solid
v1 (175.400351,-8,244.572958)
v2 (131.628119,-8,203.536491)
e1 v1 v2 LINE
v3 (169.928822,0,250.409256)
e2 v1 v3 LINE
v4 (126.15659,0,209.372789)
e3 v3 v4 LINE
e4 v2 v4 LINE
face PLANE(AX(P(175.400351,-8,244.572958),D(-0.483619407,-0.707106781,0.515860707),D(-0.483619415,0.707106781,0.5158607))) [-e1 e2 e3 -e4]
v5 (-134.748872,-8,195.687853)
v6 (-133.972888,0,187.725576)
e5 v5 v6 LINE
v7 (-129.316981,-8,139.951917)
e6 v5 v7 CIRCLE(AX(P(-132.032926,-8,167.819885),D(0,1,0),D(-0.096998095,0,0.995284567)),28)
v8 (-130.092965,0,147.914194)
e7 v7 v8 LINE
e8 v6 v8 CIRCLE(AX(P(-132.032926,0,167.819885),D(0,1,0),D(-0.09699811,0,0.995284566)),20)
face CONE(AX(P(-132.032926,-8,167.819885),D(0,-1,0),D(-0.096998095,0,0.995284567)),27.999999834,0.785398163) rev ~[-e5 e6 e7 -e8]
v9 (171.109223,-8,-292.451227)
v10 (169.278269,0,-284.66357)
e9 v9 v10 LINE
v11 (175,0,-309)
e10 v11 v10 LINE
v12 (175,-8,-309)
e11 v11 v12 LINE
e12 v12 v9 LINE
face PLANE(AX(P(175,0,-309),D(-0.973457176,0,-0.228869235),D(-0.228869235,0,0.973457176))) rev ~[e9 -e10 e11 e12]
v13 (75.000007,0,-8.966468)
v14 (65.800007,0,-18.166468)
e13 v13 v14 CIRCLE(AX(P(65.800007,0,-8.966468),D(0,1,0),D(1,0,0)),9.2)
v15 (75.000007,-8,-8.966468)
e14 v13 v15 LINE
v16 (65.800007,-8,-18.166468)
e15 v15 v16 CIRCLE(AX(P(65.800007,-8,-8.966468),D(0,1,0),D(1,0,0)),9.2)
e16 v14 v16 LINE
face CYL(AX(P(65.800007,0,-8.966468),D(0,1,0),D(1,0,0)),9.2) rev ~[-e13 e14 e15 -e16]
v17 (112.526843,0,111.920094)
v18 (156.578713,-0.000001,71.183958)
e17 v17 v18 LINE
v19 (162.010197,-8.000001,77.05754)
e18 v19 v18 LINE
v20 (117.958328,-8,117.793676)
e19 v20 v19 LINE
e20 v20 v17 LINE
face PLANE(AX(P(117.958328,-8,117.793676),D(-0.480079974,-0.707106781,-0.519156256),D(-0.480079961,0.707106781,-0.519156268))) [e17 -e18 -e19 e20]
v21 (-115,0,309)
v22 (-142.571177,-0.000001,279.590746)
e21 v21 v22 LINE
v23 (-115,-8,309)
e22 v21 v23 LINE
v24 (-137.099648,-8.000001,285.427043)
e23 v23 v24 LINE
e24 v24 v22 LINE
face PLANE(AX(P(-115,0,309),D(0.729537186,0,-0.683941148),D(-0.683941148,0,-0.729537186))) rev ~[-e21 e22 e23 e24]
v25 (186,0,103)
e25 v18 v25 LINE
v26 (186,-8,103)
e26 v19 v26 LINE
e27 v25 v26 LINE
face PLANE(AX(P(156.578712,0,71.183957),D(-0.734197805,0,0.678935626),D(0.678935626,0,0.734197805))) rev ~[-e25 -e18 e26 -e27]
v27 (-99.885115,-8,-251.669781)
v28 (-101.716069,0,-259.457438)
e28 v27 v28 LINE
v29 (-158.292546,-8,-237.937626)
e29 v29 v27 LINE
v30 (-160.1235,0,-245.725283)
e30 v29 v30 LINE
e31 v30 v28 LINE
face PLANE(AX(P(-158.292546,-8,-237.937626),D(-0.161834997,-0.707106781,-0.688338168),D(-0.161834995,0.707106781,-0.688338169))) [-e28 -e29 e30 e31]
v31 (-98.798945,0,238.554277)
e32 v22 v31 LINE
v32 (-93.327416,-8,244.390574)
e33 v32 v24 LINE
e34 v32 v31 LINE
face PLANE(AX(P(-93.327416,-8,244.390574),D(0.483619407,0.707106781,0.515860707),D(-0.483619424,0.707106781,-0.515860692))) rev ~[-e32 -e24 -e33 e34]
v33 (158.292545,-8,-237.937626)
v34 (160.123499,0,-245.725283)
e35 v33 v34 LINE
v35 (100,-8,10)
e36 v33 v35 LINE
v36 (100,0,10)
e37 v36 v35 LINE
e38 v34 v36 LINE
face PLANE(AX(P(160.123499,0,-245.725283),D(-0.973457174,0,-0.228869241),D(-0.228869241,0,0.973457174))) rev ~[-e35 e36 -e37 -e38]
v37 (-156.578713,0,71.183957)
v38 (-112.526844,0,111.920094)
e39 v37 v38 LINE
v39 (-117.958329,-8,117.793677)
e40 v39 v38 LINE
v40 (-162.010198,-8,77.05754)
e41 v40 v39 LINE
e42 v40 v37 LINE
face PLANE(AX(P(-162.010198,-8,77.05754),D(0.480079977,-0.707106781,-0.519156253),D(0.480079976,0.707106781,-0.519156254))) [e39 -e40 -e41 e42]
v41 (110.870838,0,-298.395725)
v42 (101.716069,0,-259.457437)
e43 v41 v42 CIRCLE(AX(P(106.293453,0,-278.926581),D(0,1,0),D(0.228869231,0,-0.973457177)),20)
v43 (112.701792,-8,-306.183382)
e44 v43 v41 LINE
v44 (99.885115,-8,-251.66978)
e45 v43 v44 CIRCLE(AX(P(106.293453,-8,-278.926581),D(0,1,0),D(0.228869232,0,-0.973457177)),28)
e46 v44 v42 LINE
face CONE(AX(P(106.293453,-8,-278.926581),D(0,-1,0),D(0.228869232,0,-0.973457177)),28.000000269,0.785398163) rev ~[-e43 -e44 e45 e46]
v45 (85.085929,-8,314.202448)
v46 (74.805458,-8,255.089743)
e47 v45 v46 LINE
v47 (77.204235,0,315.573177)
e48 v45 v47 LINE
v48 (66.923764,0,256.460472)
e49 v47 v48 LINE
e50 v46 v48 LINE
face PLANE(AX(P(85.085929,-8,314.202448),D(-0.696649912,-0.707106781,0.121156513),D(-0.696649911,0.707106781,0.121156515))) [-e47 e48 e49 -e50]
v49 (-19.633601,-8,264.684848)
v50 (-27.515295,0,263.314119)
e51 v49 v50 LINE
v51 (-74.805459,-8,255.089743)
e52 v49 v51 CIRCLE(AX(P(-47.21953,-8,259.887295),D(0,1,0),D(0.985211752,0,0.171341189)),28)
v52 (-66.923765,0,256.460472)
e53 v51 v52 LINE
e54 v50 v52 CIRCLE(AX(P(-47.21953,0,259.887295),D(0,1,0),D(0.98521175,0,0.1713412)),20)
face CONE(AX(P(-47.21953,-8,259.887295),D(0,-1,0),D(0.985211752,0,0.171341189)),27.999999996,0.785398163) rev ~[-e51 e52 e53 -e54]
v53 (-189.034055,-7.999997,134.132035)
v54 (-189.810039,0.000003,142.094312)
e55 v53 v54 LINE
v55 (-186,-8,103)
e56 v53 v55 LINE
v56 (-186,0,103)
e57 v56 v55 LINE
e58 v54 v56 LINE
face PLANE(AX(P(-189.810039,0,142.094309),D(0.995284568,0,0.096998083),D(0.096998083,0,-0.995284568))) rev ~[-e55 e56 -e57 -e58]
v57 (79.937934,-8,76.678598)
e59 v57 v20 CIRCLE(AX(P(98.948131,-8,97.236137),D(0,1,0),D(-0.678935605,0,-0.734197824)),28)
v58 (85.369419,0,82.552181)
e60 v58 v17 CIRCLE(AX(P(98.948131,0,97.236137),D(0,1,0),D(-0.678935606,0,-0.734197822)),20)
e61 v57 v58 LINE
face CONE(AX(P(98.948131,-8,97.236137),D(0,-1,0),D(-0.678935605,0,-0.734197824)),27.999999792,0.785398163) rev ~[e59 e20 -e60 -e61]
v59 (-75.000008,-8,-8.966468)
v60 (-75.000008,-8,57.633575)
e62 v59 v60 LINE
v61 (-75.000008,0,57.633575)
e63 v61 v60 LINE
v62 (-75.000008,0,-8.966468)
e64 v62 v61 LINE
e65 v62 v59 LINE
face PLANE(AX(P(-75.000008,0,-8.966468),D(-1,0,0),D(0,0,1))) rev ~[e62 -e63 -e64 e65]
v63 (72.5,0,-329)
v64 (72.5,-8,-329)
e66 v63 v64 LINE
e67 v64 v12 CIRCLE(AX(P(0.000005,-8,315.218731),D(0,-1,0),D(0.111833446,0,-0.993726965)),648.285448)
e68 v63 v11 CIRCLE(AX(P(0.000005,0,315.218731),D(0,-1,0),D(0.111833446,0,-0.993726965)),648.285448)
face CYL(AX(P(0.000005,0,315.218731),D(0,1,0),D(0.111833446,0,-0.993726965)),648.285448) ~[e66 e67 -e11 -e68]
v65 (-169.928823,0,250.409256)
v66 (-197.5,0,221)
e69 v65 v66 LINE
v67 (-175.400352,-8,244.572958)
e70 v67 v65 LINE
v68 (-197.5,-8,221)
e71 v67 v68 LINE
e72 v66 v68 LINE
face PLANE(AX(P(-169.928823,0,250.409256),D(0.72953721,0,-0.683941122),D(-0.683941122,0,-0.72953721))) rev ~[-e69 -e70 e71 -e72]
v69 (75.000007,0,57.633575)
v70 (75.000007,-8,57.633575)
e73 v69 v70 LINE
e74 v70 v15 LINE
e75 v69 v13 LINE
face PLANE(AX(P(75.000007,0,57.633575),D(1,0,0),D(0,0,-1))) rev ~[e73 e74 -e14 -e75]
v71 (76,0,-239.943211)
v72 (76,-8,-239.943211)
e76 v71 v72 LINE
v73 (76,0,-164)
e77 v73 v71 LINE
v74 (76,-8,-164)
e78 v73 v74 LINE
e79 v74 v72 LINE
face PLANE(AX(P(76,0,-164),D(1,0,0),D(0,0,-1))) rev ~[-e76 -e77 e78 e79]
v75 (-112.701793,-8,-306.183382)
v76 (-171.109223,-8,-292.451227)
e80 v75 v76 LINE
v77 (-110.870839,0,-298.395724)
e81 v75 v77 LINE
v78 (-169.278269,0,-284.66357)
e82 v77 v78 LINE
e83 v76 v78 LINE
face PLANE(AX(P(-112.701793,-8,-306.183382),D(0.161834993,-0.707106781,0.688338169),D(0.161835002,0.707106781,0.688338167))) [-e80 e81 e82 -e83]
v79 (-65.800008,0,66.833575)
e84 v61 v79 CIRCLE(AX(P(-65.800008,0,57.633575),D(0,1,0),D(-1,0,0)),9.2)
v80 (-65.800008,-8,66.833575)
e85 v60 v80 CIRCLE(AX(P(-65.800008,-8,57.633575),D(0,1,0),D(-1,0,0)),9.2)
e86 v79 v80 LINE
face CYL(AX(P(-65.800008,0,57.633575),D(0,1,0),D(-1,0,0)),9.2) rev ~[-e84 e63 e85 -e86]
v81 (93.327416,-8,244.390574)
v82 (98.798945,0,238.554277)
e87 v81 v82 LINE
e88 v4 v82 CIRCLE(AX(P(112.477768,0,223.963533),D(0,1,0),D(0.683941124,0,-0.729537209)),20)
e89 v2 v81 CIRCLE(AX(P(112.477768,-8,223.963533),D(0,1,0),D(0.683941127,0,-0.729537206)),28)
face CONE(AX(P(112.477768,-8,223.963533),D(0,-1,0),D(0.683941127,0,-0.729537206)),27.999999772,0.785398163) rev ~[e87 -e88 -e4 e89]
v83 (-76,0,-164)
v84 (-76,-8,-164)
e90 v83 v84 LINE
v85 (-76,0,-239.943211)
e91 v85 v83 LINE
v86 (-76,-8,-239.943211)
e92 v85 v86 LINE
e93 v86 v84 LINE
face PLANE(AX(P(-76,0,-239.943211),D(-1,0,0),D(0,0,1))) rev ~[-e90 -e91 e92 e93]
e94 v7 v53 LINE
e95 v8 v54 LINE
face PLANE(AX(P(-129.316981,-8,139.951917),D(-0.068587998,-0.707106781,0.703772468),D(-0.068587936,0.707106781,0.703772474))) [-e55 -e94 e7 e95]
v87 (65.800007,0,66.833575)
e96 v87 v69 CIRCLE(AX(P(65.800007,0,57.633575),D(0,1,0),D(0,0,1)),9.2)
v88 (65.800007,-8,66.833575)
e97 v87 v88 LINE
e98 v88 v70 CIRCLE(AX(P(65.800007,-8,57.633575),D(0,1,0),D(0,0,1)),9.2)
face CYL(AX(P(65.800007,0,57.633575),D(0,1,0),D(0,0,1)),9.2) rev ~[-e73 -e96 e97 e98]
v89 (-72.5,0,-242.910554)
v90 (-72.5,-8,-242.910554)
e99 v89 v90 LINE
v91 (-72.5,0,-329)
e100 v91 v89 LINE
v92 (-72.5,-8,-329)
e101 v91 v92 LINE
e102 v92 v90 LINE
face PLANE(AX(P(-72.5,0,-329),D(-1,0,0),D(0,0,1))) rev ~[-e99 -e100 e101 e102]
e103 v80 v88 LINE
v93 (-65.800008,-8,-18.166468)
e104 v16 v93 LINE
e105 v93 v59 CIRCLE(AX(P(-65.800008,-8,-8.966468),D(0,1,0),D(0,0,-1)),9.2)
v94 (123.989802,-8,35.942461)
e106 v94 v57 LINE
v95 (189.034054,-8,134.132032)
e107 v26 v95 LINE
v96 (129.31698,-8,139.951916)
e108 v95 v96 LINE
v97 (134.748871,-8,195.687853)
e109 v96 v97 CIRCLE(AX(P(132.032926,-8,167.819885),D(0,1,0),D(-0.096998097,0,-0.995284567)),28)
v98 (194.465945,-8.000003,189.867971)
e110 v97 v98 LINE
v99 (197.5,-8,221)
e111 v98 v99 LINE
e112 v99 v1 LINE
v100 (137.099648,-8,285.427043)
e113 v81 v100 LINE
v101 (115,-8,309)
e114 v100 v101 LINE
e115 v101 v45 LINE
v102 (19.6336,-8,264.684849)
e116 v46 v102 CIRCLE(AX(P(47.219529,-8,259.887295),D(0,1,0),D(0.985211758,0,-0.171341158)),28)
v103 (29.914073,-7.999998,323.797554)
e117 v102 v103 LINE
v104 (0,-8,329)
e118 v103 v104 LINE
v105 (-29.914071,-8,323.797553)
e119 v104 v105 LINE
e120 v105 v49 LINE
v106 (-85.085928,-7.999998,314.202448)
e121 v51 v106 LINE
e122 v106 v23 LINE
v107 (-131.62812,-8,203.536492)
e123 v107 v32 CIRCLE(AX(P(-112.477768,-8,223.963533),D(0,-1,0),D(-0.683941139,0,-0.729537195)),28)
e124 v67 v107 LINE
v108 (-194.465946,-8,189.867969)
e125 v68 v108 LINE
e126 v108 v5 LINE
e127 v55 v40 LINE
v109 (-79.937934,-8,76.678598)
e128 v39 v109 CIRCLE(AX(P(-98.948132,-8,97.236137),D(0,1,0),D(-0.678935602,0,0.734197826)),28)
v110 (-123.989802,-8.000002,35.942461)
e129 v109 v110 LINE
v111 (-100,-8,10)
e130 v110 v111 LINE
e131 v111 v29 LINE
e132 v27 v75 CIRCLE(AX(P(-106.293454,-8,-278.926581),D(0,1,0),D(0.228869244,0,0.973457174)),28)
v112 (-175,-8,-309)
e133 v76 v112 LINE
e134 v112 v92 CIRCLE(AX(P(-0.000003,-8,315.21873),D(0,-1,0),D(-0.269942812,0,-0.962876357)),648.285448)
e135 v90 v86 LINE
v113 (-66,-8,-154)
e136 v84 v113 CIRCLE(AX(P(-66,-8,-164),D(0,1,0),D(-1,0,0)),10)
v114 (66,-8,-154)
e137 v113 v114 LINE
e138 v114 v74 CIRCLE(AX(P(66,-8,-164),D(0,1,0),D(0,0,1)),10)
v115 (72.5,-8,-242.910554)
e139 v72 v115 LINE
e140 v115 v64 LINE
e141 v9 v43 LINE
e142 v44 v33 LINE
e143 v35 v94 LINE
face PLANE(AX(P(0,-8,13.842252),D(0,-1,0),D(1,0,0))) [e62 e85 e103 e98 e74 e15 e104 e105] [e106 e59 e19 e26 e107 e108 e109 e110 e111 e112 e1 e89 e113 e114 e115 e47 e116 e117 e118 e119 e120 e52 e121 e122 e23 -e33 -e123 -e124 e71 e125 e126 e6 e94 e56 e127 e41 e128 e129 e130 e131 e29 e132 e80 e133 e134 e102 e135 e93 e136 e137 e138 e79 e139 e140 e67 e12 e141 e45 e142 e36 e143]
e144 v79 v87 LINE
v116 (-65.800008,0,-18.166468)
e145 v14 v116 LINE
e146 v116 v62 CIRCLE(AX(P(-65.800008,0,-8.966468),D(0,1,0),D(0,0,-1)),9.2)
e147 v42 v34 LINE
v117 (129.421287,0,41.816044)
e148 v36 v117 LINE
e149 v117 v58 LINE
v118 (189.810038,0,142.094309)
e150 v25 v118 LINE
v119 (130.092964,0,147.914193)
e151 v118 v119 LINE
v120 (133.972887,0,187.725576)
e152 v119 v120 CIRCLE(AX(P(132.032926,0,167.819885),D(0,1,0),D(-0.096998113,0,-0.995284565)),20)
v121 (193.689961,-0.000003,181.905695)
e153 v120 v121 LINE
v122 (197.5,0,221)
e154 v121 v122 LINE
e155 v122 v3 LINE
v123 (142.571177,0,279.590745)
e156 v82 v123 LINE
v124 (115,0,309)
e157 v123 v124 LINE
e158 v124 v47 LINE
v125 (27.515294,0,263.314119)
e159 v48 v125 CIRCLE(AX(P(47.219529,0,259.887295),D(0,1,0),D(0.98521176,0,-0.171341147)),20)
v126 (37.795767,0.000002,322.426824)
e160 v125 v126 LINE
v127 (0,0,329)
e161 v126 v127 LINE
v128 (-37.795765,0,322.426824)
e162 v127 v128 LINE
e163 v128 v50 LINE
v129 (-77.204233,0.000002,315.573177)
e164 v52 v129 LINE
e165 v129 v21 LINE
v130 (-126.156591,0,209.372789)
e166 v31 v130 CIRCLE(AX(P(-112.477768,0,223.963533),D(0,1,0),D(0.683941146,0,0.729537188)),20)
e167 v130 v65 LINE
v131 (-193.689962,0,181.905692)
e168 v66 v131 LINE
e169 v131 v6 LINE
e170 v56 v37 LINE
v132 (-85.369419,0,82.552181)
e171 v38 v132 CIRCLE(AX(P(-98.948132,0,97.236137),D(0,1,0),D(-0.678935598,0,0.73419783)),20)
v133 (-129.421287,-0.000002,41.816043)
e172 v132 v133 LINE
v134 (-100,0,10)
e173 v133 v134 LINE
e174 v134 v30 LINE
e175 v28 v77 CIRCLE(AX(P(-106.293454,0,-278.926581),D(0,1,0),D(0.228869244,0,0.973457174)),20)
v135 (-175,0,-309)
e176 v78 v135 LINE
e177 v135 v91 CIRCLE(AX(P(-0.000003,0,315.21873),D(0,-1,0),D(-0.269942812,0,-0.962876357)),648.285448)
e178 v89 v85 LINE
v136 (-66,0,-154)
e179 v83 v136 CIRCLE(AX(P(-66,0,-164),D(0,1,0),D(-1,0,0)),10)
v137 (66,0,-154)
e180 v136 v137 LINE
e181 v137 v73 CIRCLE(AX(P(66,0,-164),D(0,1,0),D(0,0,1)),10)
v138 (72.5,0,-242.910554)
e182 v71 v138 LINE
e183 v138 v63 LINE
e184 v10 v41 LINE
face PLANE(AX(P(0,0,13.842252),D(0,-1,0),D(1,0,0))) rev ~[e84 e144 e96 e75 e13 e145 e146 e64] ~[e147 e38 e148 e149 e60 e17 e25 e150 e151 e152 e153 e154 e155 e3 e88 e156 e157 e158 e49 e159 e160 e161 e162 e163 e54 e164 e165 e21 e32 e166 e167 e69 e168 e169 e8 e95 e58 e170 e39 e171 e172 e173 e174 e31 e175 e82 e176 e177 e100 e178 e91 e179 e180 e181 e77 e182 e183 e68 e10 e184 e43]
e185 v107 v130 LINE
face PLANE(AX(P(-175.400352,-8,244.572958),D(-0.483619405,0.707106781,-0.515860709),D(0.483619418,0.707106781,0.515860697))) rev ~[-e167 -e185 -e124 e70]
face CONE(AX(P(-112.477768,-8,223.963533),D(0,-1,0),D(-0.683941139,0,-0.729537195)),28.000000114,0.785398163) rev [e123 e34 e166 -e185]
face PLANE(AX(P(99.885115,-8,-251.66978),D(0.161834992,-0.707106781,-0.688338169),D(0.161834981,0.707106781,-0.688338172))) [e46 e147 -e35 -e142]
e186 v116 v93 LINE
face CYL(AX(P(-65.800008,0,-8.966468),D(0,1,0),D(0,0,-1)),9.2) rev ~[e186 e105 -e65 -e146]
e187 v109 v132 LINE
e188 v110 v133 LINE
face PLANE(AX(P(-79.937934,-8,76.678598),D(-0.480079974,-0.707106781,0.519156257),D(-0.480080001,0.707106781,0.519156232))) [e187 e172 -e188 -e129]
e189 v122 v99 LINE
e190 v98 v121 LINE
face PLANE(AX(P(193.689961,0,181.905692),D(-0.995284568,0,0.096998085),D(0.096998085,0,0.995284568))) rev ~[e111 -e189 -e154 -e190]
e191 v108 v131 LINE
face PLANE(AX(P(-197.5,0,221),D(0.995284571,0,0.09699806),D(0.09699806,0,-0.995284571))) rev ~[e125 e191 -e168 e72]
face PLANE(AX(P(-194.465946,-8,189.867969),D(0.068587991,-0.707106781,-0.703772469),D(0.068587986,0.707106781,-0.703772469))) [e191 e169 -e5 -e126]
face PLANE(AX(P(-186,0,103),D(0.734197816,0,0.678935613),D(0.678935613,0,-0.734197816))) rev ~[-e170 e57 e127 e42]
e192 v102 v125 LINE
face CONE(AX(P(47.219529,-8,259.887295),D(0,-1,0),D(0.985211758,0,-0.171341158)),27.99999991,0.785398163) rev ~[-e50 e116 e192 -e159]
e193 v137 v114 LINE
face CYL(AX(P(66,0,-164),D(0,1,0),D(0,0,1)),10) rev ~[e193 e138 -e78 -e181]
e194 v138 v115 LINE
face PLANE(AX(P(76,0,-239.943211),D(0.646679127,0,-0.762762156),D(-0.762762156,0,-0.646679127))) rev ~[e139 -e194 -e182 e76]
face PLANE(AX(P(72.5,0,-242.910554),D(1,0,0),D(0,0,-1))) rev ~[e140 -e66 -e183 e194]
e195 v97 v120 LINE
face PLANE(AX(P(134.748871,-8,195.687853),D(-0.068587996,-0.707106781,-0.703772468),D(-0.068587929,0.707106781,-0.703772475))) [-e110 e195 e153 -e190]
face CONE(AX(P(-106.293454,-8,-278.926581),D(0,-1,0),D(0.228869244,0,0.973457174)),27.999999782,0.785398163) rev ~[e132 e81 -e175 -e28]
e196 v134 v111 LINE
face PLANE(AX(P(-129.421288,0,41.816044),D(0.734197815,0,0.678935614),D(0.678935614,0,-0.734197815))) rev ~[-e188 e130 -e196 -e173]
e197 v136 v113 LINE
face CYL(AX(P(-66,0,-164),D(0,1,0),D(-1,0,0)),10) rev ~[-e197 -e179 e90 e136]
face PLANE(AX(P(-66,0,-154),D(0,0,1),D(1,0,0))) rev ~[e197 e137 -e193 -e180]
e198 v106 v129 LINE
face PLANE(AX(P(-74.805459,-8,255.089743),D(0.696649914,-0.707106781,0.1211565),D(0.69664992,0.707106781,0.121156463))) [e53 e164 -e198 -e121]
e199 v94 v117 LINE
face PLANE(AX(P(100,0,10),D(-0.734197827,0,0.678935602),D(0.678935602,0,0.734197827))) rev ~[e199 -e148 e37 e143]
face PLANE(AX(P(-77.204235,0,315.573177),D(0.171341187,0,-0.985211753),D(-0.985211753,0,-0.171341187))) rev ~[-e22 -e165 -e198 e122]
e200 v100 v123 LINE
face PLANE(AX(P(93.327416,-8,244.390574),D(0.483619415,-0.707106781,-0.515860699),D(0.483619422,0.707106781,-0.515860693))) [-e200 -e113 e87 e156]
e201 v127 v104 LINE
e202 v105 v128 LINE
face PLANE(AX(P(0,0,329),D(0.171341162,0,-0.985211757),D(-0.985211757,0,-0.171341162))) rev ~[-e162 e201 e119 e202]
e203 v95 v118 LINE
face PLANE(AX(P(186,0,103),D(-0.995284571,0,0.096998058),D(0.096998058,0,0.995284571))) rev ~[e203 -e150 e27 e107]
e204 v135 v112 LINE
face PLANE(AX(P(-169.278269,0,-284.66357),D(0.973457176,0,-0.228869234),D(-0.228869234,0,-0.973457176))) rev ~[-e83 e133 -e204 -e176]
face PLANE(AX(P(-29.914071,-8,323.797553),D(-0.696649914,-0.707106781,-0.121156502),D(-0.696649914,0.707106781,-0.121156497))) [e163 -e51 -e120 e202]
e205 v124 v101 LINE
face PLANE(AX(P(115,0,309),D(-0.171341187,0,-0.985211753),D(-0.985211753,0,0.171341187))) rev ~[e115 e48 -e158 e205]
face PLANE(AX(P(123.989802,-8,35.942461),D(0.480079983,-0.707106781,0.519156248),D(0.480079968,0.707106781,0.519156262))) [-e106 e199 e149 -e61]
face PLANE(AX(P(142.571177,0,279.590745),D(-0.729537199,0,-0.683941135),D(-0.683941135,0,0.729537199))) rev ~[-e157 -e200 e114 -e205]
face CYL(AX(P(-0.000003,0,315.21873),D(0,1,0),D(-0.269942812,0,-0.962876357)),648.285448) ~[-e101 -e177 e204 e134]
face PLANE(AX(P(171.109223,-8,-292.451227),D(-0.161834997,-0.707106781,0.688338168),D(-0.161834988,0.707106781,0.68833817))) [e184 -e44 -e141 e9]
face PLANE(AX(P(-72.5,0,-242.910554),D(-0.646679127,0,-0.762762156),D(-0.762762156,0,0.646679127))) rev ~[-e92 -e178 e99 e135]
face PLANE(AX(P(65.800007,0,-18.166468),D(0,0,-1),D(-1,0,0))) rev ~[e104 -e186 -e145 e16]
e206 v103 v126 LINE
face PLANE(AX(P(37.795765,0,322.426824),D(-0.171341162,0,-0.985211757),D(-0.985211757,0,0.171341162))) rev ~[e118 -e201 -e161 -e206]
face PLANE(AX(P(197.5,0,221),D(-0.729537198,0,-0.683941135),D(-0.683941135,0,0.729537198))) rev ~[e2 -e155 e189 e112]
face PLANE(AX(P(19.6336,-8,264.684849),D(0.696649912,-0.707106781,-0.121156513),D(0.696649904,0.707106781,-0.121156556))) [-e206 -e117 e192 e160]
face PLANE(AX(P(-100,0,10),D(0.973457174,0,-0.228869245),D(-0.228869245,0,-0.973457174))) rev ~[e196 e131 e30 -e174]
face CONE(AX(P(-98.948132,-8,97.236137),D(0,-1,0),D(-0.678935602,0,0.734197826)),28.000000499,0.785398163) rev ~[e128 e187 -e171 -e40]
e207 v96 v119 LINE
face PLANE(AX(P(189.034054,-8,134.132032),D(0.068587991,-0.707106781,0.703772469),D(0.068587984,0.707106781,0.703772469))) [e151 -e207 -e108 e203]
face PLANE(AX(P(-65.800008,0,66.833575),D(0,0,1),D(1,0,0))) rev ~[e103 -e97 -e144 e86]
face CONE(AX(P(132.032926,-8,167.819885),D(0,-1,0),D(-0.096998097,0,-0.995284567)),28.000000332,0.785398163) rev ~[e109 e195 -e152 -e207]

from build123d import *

# Parameters (mm, degrees)
F1_DEPTH = 8


# Not quite as in the source:
# - ends of sketch curves that miss each other by under 0.0002 mm in the source are joined


with BuildPart() as f1:
    # F0 (on Front) → F1 (new body)
    with BuildSketch(Plane.XZ):
        with BuildLine():
            Line((76, -164), (76, -239.943211))
            Line((76, -239.943211), (72.5, -242.910554))
            Line((72.5, -242.910554), (72.5, -329))
            ThreePointArc((72.5, -329), (124.1533829832, -321.067337789), (175.0000000351, -309.0000001251))
            Line((175.0000000351, -309.0000001251), (169.278269, -284.66357))
            Line((169.278269, -284.66357), (110.870838, -298.395725))
            ThreePointArc((110.870838, -298.395725), (86.8243094388, -283.5039655144), (101.716068848, -259.4574373536))
            Line((101.716068848, -259.4574373536), (160.123499, -245.725283))
            Line((160.123499, -245.725283), (100, 10))
            Line((100, 10), (129.421287, 41.816044))
            Line((129.421287, 41.816044), (85.369419, 82.552181))
            ThreePointArc((85.369419, 82.552181), (84.2641744646, 110.8148490327), (112.5268427835, 111.9200937658))
            Line((112.5268427835, 111.9200937658), (156.578712, 71.183957))
            Line((156.578712, 71.183957), (186, 103))
            Line((186, 103), (189.810038, 142.094309))
            Line((189.810038, 142.094309), (130.092964, 147.914193))
            ThreePointArc((130.092964, 147.914193), (112.1272346173, 169.7598464886), (133.9728870415, 187.7255764263))
            Line((133.9728870415, 187.7255764263), (193.689961, 181.905692))
            Line((193.689961, 181.905692), (197.5, 221))
            Line((197.5, 221), (169.928822, 250.409256))
            Line((169.928822, 250.409256), (126.15659, 209.372789))
            ThreePointArc((126.15659, 209.372789), (97.8870239172, 210.2847104224), (98.7989451563, 238.5542768333))
            Line((98.7989451563, 238.5542768333), (142.571177, 279.590745))
            Line((142.571177, 279.590745), (115, 309))
            Line((115, 309), (77.204235, 315.573177))
            Line((77.204235, 315.573177), (66.923764, 256.460472))
            ThreePointArc((66.923764, 256.460472), (43.7927054839, 240.1830599073), (27.5152939917, 263.3141190014))
            Line((27.5152939917, 263.3141190014), (37.795765, 322.426824))
            Line((37.795765, 322.426824), (0, 329))
            Line((0, 329), (-37.795765, 322.426824))
            Line((-37.795765, 322.426824), (-27.515295, 263.314119))
            ThreePointArc((-27.515295, 263.314119), (-43.7927064839, 240.1830599073), (-66.9237651771, 256.4604719692))
            Line((-66.9237651771, 256.4604719692), (-77.204235, 315.573177))
            Line((-77.204235, 315.573177), (-115, 309))
            Line((-115, 309), (-142.571178, 279.590745))
            Line((-142.571178, 279.590745), (-98.798945, 238.554277))
            ThreePointArc((-98.798945, 238.554277), (-97.8870241667, 210.2847101563), (-126.1565908437, 209.3727891667))
            Line((-126.1565908437, 209.3727891667), (-169.928823, 250.409256))
            Line((-169.928823, 250.409256), (-197.5, 221))
            Line((-197.5, 221), (-193.689962, 181.905692))
            Line((-193.689962, 181.905692), (-133.972888, 187.725576))
            ThreePointArc((-133.972888, 187.725576), (-112.1272346173, 169.7598464886), (-130.092965055, 147.9141935643))
            Line((-130.092965055, 147.9141935643), (-189.810039, 142.094309))
            Line((-189.810039, 142.094309), (-186, 103))
            Line((-186, 103), (-156.578713, 71.183957))
            Line((-156.578713, 71.183957), (-112.526844, 111.920094))
            ThreePointArc((-112.526844, 111.920094), (-84.2641747139, 110.8148493022), (-85.3694187181, 82.5521806951))
            Line((-85.3694187181, 82.5521806951), (-129.421288, 41.816044))
            Line((-129.421288, 41.816044), (-100, 10))
            Line((-100, 10), (-160.1235, -245.725283))
            Line((-160.1235, -245.725283), (-101.716069, -259.457438))
            ThreePointArc((-101.716069, -259.457438), (-86.8243105502, -283.5039659882), (-110.8708388768, -298.395724476))
            Line((-110.8708388768, -298.395724476), (-169.278269, -284.66357))
            Line((-169.278269, -284.66357), (-175, -309))
            ThreePointArc((-175, -309), (-124.1533829832, -321.067337789), (-72.5000000145, -329.0000001291))
            Line((-72.5000000145, -329.0000001291), (-72.5, -242.910554))
            Line((-72.5, -242.910554), (-76, -239.943211))
            Line((-76, -239.943211), (-76, -164))
            ThreePointArc((-76, -164), (-73.0710678119, -156.9289321881), (-66, -154))
            Line((-66, -154), (0, -154))
            Line((0, -154), (66, -154))
            ThreePointArc((66, -154), (73.0710678119, -156.9289321881), (76, -164))
        make_face()
        with BuildLine():
            Line((65.800007, -18.166468), (0, -18.166468))
            Line((0, -18.166468), (-65.800008, -18.166468))
            ThreePointArc((-65.800008, -18.166468), (-72.3053903869, -15.4718503869), (-75.000008, -8.966468))
            Line((-75.000008, -8.966468), (-75.000008, 57.633575))
            ThreePointArc((-75.000008, 57.633575), (-72.3053903869, 64.1389573869), (-65.800008, 66.833575))
            Line((-65.800008, 66.833575), (0, 66.833575))
            Line((0, 66.833575), (65.800007, 66.833575))
            ThreePointArc((65.800007, 66.833575), (72.3053893869, 64.1389573869), (75.000007, 57.633575))
            Line((75.000007, 57.633575), (75.000007, -8.966468))
            ThreePointArc((75.000007, -8.966468), (72.3053893869, -15.4718503869), (65.800007, -18.166468))
        make_face(mode=Mode.SUBTRACT)
    extrude(amount=F1_DEPTH)

    # F3: sweep along a path in F3_path
    with BuildLine(Plane(origin=(110.870838, -8, -298.395725), x_dir=(0, 0, 1), z_dir=(0, -1, 0))) as f3_path:
        Line((13.732155, -58.407431), (0, 0))
        ThreePointArc((0, 0), (14.8917592236, 24.0465284996), (38.9382876464, 9.154769152))
        Line((38.9382876464, 9.154769152), (52.670442, -49.252661))
    # F2 (on face) → F3 (sweep, cut)
    with BuildSketch(Plane(origin=(96.989833717, 0, 22.8032516792), x_dir=(0, 1, 0), z_dir=(0.973457176, 0, 0.2288692344))):
        Polygon((0, -315.8503827909), (-8, -315.8503827909), (-8, -323.8503827909), align=None)
    sweep(path=f3_path.line, mode=Mode.SUBTRACT)

    # F5: sweep along a path in F5_path
    with BuildLine(Plane(origin=(85.369419, -8, 82.552181), x_dir=(0, 0, 1), z_dir=(0, -1, 0))) as f5_path:
        Line((-40.736137, -44.051868), (0, 0))
        ThreePointArc((0, 0), (28.2626681852, 1.1052443944), (29.3679127658, -27.1574237835))
        Line((29.3679127658, -27.1574237835), (-11.368224, -71.209293))
    # F4 (on face) → F5 (sweep, cut)
    with BuildSketch(Plane(origin=(48.9199144477, 0, -45.2377688119), x_dir=(0, 1, 0), z_dir=(0.7341978267, 0, -0.6789356017))):
        Polygon((0, 118.5699679847), (-8, 118.5699679847), (-8, 110.5699679847), align=None)
    sweep(path=f5_path.line, mode=Mode.SUBTRACT)

    # F7: sweep along a path in F7_path
    with BuildLine(Plane(origin=(130.092964, -8, 147.914193), x_dir=(0, 0, 1), z_dir=(0, -1, 0))) as f7_path:
        Line((-5.819884, -59.717074), (0, 0))
        ThreePointArc((0, 0), (21.8456531581, 17.9657294149), (39.8113834263, -3.8799230415))
        Line((39.8113834263, -3.8799230415), (33.991499, -63.596997))
    # F6 (on face) → F7 (sweep, cut)
    with BuildSketch(Plane(origin=(174.3063070687, 0, -16.9874764527), x_dir=(0, 1, 0), z_dir=(0.9952845708, 0, -0.0969980576))):
        Polygon((0, 159.8354783382), (-8, 159.8354783382), (-8, 151.8354783382), align=None)
    sweep(path=f7_path.line, mode=Mode.SUBTRACT)

    # F9: sweep along a path in F9_path
    with BuildLine(Plane(origin=(126.15659, -8, 209.372789), x_dir=(0, 0, 1), z_dir=(0, -1, 0))) as f9_path:
        Line((41.036467, -43.772232), (0, 0))
        ThreePointArc((0, 0), (0.9119215885, 28.2695662386), (29.1814878333, 27.3576448437))
        Line((29.1814878333, 27.3576448437), (70.217956, -16.414587))
    # F8 (on face) → F9 (sweep, cut)
    with BuildSketch(Plane(origin=(215.3846137301, 0, 201.9230790338), x_dir=(0, 1, 0), z_dir=(0.729537198, 0, 0.6839411355))):
        Polygon((0, 66.4615554934), (-8, 66.4615554934), (-8, 58.4615554934), align=None)
    sweep(path=f9_path.line, mode=Mode.SUBTRACT)

    # F11: sweep along a path in F11_path
    with BuildLine(Plane(origin=(66.923764, -8, 256.460472), x_dir=(0, 0, 1), z_dir=(0, -1, 0))) as f11_path:
        Line((59.112705, -10.280471), (0, 0))
        ThreePointArc((0, 0), (-16.2774120773, 23.1310586047), (6.8536470014, 39.4084700083))
        Line((6.8536470014, 39.4084700083), (65.966352, 29.127999))
    # F10 (on face) → F11 (sweep, cut)
    with BuildSketch(Plane(origin=(55.5376187282, 0, 319.3412844519), x_dir=(0.9852117527, 0, -0.1713411869), z_dir=(0.1713411869, 0, 0.9852117527))):
        Polygon((21.9918369956, 0), (21.9918369956, -8), (29.9918369956, -8), align=None)
    sweep(path=f11_path.line, mode=Mode.SUBTRACT)

    # F13: sweep along a path in F13_path
    with BuildLine(Plane(origin=(-27.515295, -8, 263.314119), x_dir=(0, 0, 1), z_dir=(0, -1, 0))) as f13_path:
        Line((59.112705, 10.28047), (0, 0))
        ThreePointArc((0, 0), (-23.1310590934, 16.277411488), (-6.8536470308, 39.4084701771))
        Line((-6.8536470308, 39.4084701771), (52.259058, 49.68894))
    # F12 (on face) → F13 (sweep, cut)
    with BuildSketch(Plane(origin=(-55.5376105295, 0, 319.341285892), x_dir=(0.9852117571, 0, 0.1713411616), z_dir=(-0.1713411616, 0, 0.9852117571))):
        Polygon((18.008154492, 0), (18.008154492, -8), (26.008154492, -8), align=None)
    sweep(path=f13_path.line, mode=Mode.SUBTRACT)

    # F15: sweep along a path in F15_path
    with BuildLine(Plane(origin=(-126.1565908437, -8, 209.3727891667), x_dir=(0, 0, -1), z_dir=(0, 1, 0))) as f15_path:
        Line((-41.0364668333, 43.7722321563), (0, 0))
        ThreePointArc((0, 0), (-0.9119210729, -28.2695667552), (-29.1814878333, -27.3576458437))
        Line((-29.1814878333, -27.3576458437), (-70.2179558333, 16.4145871563))
    # F14 (on face) → F15 (sweep, cut)
    with BuildSketch(Plane(origin=(-215.3846129172, 0, 201.9230851377), x_dir=(0, -1, 0), z_dir=(-0.7295371863, 0, 0.6839411479))):
        Polygon((0, 106.461550303), (8, 106.461550303), (8, 114.461550303), align=None)
    sweep(path=f15_path.line, mode=Mode.SUBTRACT)

    # F17: sweep along a path in F17_path
    with BuildLine(Plane(origin=(-133.972888, -8, 187.725576), x_dir=(0, 0, 1), z_dir=(0, -1, 0))) as f17_path:
        Line((-5.819884, 59.717074), (0, 0))
        ThreePointArc((0, 0), (-17.9657296763, -21.8456533988), (-39.8113824357, -3.879922945))
        Line((-39.8113824357, -3.879922945), (-45.631267, 55.837151))
    # F16 (on face) → F17 (sweep, cut)
    with BuildSketch(Plane(origin=(-174.3063082, 0, -16.9874769975), x_dir=(0, -1, 0), z_dir=(-0.9952845705, 0, -0.09699806))):
        Polygon((0, 199.8354791034), (8, 199.8354791034), (8, 207.8354791034), align=None)
    sweep(path=f17_path.line, mode=Mode.SUBTRACT)

    # F19: sweep along a path in F19_path
    with BuildLine(Plane(origin=(-112.526844, -8, 111.920094), x_dir=(0, 0, 1), z_dir=(0, -1, 0))) as f19_path:
        Line((-40.736137, 44.051869), (0, 0))
        ThreePointArc((0, 0), (-1.1052443315, -28.2626689474), (-29.3679133049, -27.1574252819))
        Line((-29.3679133049, -27.1574252819), (-70.10405, 16.894444))
    # F18 (on face) → F19 (sweep, cut)
    with BuildSketch(Plane(origin=(-48.9199129921, 0, -45.2377688877), x_dir=(0, -1, 0), z_dir=(-0.7341978161, 0, -0.6789356132))):
        Polygon((0, 158.5699702901), (8, 158.5699702901), (8, 166.5699702901), align=None)
    sweep(path=f19_path.line, mode=Mode.SUBTRACT)

    # F21: sweep along a path in F21_path
    with BuildLine(Plane(origin=(-101.716069, -8, -259.457438), x_dir=(0, 0, 1), z_dir=(0, -1, 0))) as f21_path:
        Line((13.732155, 58.407431), (0, 0))
        ThreePointArc((0, 0), (-24.0465282, -14.8917584), (-38.938286476, 9.1547698768))
        Line((-38.938286476, 9.1547698768), (-25.206132, 67.5622))
    # F20 (on face) → F21 (sweep, cut)
    with BuildSketch(Plane(origin=(-96.9898309629, 0, 22.8032521208), x_dir=(0, -1, 0), z_dir=(-0.9734571736, 0, 0.2288692447))):
        Polygon((0, -275.8503839769), (8, -275.8503839769), (8, -267.8503839769), align=None)
    sweep(path=f21_path.line, mode=Mode.SUBTRACT)


solid = f1.part
